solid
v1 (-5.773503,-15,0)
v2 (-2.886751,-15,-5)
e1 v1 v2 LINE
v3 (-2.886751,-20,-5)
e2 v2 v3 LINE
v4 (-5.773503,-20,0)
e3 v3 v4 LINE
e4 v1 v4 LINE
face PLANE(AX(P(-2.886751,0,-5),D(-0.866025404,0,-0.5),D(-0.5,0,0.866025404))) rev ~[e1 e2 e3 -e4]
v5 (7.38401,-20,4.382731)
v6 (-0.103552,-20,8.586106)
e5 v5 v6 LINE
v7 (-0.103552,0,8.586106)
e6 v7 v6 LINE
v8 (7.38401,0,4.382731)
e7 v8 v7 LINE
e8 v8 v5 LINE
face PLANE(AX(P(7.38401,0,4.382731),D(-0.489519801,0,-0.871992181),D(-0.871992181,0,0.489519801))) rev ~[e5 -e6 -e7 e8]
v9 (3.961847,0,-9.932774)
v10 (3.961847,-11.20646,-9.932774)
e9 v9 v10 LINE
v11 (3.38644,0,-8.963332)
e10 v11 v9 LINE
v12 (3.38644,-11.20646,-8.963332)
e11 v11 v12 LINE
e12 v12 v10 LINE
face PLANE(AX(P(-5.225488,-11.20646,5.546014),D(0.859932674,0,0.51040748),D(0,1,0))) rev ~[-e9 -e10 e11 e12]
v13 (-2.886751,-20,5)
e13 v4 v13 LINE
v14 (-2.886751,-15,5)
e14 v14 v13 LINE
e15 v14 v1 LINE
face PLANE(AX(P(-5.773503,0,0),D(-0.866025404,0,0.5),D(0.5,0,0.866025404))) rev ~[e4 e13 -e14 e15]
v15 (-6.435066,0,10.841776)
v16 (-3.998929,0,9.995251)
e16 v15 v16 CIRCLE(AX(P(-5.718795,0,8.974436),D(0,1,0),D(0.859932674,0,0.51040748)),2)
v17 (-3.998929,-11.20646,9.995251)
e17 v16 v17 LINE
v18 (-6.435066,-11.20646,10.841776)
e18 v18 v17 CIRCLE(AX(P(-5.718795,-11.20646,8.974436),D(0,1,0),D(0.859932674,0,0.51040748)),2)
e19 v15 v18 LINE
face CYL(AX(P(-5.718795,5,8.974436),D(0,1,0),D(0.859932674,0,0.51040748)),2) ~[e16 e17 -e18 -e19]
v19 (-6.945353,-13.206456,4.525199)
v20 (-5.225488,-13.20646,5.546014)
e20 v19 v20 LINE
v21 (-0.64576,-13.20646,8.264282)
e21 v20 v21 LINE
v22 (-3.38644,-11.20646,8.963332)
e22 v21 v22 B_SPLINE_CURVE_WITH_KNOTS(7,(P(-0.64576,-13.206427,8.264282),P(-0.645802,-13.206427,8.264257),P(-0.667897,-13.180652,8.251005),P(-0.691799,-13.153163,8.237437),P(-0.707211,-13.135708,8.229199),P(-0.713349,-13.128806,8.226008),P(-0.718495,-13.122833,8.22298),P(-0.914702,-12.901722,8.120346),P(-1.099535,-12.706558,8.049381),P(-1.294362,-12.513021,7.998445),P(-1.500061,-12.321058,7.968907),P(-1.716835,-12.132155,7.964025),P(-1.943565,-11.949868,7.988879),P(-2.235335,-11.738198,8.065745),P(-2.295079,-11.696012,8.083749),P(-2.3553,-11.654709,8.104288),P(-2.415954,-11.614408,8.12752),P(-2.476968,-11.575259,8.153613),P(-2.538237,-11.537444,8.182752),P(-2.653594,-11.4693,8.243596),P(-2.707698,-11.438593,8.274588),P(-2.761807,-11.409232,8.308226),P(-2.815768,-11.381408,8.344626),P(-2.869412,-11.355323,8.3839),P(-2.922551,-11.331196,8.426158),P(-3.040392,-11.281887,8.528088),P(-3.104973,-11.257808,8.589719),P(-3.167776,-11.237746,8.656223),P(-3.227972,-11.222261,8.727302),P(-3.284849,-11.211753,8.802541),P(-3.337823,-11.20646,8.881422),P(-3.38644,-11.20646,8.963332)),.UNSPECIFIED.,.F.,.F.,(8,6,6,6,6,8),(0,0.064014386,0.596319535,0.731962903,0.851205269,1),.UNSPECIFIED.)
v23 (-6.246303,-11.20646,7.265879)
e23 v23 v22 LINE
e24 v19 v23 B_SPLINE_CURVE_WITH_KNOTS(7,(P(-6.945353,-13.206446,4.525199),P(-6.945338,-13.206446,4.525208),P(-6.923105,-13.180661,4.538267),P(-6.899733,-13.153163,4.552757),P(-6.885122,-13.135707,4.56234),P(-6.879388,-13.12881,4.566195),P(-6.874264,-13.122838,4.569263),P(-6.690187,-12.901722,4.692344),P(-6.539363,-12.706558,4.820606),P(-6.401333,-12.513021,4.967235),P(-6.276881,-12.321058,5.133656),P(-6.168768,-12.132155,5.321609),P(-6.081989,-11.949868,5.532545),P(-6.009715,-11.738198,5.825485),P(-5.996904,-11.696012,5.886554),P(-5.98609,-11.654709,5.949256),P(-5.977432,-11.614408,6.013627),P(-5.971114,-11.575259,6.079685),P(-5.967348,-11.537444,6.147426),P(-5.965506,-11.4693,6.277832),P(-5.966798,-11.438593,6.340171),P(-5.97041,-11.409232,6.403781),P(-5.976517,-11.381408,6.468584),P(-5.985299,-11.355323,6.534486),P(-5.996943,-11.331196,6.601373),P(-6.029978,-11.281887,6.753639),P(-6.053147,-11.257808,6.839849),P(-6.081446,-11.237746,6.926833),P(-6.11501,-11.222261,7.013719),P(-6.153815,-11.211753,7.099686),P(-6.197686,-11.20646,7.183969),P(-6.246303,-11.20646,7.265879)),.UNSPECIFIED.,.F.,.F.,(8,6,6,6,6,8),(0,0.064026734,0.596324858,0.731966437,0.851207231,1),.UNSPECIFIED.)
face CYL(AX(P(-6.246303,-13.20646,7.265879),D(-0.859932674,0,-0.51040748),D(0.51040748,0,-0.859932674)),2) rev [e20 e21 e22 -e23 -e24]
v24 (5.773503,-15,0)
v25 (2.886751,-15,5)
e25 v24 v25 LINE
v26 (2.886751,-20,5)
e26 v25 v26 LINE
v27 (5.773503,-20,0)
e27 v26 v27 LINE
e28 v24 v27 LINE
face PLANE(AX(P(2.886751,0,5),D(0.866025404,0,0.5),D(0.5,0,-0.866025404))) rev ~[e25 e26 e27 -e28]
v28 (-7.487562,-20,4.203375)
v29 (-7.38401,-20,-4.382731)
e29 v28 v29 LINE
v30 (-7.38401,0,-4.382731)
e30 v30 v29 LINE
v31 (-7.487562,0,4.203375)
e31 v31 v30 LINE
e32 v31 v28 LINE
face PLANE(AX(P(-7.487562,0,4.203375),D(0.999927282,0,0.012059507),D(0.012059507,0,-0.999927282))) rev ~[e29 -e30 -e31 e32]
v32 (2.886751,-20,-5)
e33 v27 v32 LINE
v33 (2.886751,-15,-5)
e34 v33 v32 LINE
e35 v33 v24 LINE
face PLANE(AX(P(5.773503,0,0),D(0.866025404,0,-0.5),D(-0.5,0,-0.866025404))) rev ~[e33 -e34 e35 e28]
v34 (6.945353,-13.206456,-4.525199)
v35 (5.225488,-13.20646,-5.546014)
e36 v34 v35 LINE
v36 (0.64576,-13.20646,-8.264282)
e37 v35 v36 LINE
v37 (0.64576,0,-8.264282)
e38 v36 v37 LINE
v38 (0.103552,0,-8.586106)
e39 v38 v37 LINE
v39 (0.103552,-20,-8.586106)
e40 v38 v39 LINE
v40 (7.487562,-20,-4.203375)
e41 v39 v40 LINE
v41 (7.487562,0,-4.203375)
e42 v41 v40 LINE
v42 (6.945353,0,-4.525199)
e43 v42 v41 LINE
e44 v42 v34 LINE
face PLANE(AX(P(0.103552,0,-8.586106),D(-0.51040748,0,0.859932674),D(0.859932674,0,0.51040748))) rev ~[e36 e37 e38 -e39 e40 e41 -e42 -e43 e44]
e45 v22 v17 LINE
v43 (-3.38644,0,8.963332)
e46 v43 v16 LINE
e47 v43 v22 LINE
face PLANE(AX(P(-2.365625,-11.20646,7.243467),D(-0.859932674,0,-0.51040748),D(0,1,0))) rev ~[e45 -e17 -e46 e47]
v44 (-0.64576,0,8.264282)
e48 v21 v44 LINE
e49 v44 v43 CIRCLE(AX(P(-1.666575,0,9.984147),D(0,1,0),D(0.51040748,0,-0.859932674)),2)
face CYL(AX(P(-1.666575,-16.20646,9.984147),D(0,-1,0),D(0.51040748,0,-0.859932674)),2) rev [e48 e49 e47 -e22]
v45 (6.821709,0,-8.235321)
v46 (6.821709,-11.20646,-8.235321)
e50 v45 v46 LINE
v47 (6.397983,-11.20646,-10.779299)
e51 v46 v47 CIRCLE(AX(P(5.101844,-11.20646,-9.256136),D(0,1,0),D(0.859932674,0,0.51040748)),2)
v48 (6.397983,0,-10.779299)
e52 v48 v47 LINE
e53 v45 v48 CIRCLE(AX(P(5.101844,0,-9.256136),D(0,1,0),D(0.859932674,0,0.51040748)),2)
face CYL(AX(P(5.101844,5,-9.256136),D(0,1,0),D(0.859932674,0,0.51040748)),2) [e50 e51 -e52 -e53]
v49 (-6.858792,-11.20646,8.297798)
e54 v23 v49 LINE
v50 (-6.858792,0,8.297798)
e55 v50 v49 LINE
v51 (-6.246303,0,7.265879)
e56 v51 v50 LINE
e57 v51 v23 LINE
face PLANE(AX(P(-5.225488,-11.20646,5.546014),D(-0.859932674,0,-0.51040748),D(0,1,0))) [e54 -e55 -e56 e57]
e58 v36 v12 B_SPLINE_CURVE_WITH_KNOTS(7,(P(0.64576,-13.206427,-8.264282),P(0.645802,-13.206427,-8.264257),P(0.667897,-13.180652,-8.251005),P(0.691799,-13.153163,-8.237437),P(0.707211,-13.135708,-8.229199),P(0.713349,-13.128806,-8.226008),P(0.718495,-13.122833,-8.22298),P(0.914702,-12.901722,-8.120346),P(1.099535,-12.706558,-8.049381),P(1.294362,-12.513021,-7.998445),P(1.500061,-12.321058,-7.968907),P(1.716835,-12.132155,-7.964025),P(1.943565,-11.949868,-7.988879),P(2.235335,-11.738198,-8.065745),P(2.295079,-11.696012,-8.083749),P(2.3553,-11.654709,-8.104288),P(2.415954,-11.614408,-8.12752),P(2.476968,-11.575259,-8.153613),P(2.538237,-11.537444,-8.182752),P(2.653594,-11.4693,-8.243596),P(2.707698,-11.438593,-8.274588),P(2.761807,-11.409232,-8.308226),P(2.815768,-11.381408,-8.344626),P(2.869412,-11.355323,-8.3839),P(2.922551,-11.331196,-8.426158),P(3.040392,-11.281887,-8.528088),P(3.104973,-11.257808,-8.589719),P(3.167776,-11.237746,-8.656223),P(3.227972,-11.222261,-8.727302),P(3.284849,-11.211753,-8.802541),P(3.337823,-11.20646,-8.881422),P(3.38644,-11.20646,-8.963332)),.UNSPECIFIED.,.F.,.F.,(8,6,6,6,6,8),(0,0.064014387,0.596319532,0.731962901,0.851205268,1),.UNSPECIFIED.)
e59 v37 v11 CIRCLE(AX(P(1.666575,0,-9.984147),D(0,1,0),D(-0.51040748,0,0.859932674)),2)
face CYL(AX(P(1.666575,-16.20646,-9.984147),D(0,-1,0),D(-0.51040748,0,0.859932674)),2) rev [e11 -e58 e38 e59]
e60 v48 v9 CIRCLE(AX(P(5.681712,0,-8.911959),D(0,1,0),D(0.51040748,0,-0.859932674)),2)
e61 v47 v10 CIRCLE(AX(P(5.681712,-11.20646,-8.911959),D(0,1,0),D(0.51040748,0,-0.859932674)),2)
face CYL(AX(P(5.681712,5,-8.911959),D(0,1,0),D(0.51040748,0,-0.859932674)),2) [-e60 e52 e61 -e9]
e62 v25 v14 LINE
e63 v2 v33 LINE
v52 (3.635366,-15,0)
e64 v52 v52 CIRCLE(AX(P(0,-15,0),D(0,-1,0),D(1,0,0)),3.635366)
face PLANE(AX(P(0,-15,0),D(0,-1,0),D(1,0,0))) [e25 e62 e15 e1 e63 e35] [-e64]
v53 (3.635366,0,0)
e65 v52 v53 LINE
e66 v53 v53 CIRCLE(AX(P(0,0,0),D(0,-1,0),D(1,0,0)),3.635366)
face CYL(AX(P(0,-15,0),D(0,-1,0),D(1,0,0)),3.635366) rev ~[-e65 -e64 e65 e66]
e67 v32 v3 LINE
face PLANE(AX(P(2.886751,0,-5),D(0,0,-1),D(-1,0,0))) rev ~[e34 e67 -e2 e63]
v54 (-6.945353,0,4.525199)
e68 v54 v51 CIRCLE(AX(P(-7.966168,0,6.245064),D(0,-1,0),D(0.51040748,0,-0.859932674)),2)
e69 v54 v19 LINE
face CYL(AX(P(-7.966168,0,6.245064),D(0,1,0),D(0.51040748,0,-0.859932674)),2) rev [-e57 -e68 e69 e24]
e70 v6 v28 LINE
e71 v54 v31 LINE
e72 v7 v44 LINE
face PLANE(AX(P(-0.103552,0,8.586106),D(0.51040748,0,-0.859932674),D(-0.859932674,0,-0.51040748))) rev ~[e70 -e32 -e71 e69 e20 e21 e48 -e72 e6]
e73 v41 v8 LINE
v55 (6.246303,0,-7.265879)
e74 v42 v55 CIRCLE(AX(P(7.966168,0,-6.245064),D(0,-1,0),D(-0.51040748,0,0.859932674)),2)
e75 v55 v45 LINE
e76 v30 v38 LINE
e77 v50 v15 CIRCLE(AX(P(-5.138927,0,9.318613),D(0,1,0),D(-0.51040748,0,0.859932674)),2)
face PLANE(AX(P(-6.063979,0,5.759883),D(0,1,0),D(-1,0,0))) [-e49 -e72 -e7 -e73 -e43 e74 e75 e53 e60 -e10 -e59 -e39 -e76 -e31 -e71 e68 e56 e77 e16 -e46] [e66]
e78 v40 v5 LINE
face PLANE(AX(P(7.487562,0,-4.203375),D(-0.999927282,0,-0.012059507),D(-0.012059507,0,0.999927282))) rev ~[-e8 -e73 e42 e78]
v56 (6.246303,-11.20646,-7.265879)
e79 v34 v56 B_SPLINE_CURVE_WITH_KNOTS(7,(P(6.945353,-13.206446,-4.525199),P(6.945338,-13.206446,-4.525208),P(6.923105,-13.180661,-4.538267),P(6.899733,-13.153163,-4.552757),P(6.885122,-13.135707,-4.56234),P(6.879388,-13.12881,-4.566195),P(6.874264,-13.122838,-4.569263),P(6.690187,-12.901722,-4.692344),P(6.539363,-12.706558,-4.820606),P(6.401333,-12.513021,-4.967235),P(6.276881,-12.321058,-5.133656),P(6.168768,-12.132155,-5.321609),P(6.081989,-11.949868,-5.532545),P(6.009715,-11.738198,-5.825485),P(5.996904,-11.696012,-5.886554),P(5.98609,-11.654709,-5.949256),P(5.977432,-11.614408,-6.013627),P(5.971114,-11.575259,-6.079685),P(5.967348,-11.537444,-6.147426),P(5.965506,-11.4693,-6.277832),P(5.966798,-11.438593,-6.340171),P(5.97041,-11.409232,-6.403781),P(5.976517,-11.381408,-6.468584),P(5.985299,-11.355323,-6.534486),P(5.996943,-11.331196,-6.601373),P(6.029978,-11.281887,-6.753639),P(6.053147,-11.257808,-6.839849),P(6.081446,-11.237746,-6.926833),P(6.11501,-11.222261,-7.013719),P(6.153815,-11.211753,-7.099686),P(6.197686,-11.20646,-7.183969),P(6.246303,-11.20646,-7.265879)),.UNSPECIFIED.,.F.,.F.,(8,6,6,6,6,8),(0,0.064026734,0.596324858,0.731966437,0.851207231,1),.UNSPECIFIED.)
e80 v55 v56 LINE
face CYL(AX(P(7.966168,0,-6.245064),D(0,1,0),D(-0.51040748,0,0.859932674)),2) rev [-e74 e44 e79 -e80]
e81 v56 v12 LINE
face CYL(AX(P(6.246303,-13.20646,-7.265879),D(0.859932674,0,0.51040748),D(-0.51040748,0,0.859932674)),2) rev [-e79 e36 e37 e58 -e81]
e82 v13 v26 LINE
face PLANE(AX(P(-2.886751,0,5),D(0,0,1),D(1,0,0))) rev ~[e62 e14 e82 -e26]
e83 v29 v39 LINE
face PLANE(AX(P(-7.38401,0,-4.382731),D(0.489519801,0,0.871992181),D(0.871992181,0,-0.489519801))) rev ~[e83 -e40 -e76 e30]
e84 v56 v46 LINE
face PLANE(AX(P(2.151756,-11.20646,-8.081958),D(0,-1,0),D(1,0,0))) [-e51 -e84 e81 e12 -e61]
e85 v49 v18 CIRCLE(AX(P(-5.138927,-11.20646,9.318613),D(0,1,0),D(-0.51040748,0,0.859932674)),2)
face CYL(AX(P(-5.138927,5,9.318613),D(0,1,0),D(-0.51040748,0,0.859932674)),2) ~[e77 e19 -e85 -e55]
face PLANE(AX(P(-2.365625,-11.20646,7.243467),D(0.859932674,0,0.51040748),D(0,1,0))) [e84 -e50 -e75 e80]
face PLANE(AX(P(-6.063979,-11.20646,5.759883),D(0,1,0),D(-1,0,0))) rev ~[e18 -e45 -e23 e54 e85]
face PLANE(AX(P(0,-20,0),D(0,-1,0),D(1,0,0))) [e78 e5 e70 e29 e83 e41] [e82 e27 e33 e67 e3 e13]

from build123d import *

# Parameters (mm, degrees)
F1_DEPTH      = 20
F2_DEPTH      = 15
F4_W          = 3.3256819006
F4_H          = 11.2064601853
F5_DEPTH      = 5.2
F5_DEPTH_BACK = 20
F3_R          = 3.6353661433
F6_DEPTH      = 25
F7_T1_DEPTH   = 11.2064601853
F7_T3_DEPTH   = 3.3256819006
F7_T5_DEPTH   = 3.3256819006
F7_T11_DEPTH  = 8.3256819006
F7_T16_DEPTH  = 16.2064601853
F7_T23_DEPTH  = 16.2064601853
F7_T27_DEPTH  = 8.3256819006
F7_T35_DEPTH  = 8.3256819006
F7_T40_DEPTH  = 16.2064601853
F7_T47_DEPTH  = 16.2064601853
F7_T51_DEPTH  = 8.3256819006
F7_T55_DEPTH  = 21.2064601853


# Not quite as in the source:
# - a fillet or chamfer that OpenCascade refuses, or shapes differently, is made with other operations: its cross-section is extruded or revolved along the edge and cut away or added


with BuildPart() as f1:
    # F0 (on Front) → F1 (new body)
    with BuildSketch(Plane.XZ):
        Polygon((7.3840099636, 4.3827313822), (-0.1035517331, 8.5861059014), (-7.4875616967, 4.2033745192), (-7.3840099636, -4.3827313822), (0.1035517331, -8.5861059014), (7.4875616967, -4.2033745192), align=None)
        Polygon((-2.8867513459, 5), (2.8867513459, 5), (5.7735026919, 0), (2.8867513459, -5), (-2.8867513459, -5), (-5.7735026919, 0), align=None, mode=Mode.SUBTRACT)
    extrude(amount=F1_DEPTH)

    # F0 (on Front) → F2 (join)
    with BuildSketch(Plane.XZ):
        Polygon((5.7735026919, 0), (2.8867513459, 5), (-2.8867513459, 5), (-5.7735026919, 0), (-2.8867513459, -5), (2.8867513459, -5), align=None)
    extrude(amount=F2_DEPTH)

    # F4 (on face) → F5 (join, two sides)
    with BuildSketch(Plane(origin=(-3.7955567149, 0, 6.3947402103), x_dir=(0.8599326743, 0, 0.51040748), z_dir=(-0.51040748, 0, 0.8599326743))) as f5_sk:
        with Locations((0, -5.6032300927)):
            Rectangle(F4_W, F4_H)
    extrude(amount=F5_DEPTH)
    extrude(f5_sk.sketch, amount=-F5_DEPTH_BACK)

    # F3 (on face) → F6 (cut)
    with BuildSketch(Plane.XZ.offset(15)):
        Circle(F3_R)
    extrude(amount=-F6_DEPTH, mode=Mode.SUBTRACT)

    # F7: fillet of radius 2 on 10 edges, made by hand

    # F7_s2 → F7_t1 (join)
    with BuildSketch(Plane.XZ):
        with BuildLine():
            ThreePointArc((-6.9453533288, 4.525198791), (-6.0282146576, 5.7507608695), (-6.2463029403, 7.2658790997))
            Line((-6.2463029403, 7.2658790997), (-5.2254879802, 5.5460137511))
            Line((-5.2254879802, 5.5460137511), (-6.9453533288, 4.525198791))
        make_face()
        with BuildLine():
            ThreePointArc((-0.645760101, 8.2642816296), (-2.1608783312, 8.0461933468), (-3.3864404097, 8.963332018))
            Line((-3.3864404097, 8.963332018), (-2.3656254496, 7.2434666695))
            Line((-2.3656254496, 7.2434666695), (-0.645760101, 8.2642816296))
        make_face()
        with BuildLine():
            ThreePointArc((6.9453533288, -4.525198791), (6.0282146576, -5.7507608695), (6.2463029403, -7.2658790997))
            Line((6.2463029403, -7.2658790997), (5.2254879802, -5.5460137511))
            Line((5.2254879802, -5.5460137511), (6.9453533288, -4.525198791))
        make_face()
        with BuildLine():
            ThreePointArc((0.645760101, -8.2642816296), (2.1608783312, -8.0461933468), (3.3864404097, -8.963332018))
            Line((3.3864404097, -8.963332018), (2.3656254496, -7.2434666695))
            Line((2.3656254496, -7.2434666695), (0.645760101, -8.2642816296))
        make_face()
    extrude(amount=F7_T1_DEPTH)

    # F7_s4 → F7_t3 (join)
    with BuildSketch(Plane(origin=(-1.4299312653, 0, -0.8487264592), x_dir=(0, 1, 0), z_dir=(0.8599326743, 0, 0.51040748))):
        with BuildLine():
            ThreePointArc((-13.2064601853, 7.4363265887), (-11.792246623, 8.0221130263), (-11.2064601853, 9.4363265887))
            Line((-11.2064601853, 9.4363265887), (-11.2064601853, 7.4363265887))
            Line((-11.2064601853, 7.4363265887), (-13.2064601853, 7.4363265887))
        make_face()
    extrude(amount=F7_T3_DEPTH)

    # F7_s6 → F7_t5 (join)
    with BuildSketch(Plane(origin=(1.4299312653, 0, 0.8487264592), x_dir=(0, 1, 0), z_dir=(-0.8599326743, 0, -0.51040748))):
        with BuildLine():
            ThreePointArc((-13.2064601853, 7.4363265887), (-11.792246623, 8.0221130263), (-11.2064601853, 9.4363265887))
            Line((-11.2064601853, 9.4363265887), (-11.2064601853, 7.4363265887))
            Line((-11.2064601853, 7.4363265887), (-13.2064601853, 7.4363265887))
        make_face()
    extrude(amount=F7_T5_DEPTH)


with BuildPart() as f7_tool9:
    # F7_s10 → F7_t11 (new body)
    with BuildSketch(Plane(origin=(-5.7295946368, 0, -3.4007638594), x_dir=(0, 1, 0), z_dir=(0.8599326743, 0, 0.51040748))):
        with BuildLine():
            ThreePointArc((-13.2064601853, 7.4363265887), (-11.792246623, 8.0221130263), (-11.2064601853, 9.4363265887))
            Line((-11.2064601853, 9.4363265887), (-11.2064601853, 7.4363265887))
            Line((-11.2064601853, 7.4363265887), (-13.2064601853, 7.4363265887))
        make_face()
    extrude(amount=F7_T11_DEPTH)

    split(bisect_by=Plane(origin=(-7.4357858302, 0, -0.0896784315), x_dir=(0, 1, 0), z_dir=(0.9999272815, 0, 0.0120595069)), keep=Keep.TOP)

    split(bisect_by=Plane(origin=(-1.4299312653, 0, -0.8487264592), x_dir=(0, 1, 0), z_dir=(-0.8599326743, 0, -0.51040748)), keep=Keep.TOP)


with BuildPart() as f7_tool14:
    # F7_s15 → F7_t16 (new body)
    with BuildSketch(Plane.XZ):
        with BuildLine():
            ThreePointArc((-6.9453533288, 4.525198791), (-6.0282146576, 5.7507608695), (-6.2463029403, 7.2658790997))
            Line((-6.2463029403, 7.2658790997), (-5.2254879802, 5.5460137511))
            Line((-5.2254879802, 5.5460137511), (-6.9453533288, 4.525198791))
        make_face()
    extrude(amount=F7_T16_DEPTH)

    split(bisect_by=Plane.XZ.offset(11.2064601853), keep=Keep.TOP)


with BuildPart() as f7_tool9_1:
    add(f7_tool9.part)

    # F7_t18: intersect F7_tool14
    add(f7_tool14.part, mode=Mode.INTERSECT)


with BuildPart() as f1_1:
    add(f1.part)

    # F7_t7: union F7_tool9
    add(f7_tool9_1.part)


with BuildPart() as f7_tool21:
    # F7_s22 → F7_t23 (new body)
    with BuildSketch(Plane.XZ.offset(16.2064601853)):
        with BuildLine():
            ThreePointArc((-0.645760101, 8.2642816296), (-2.1608783312, 8.0461933468), (-3.3864404097, 8.963332018))
            Line((-3.3864404097, 8.963332018), (-2.3656254496, 7.2434666695))
            Line((-2.3656254496, 7.2434666695), (-0.645760101, 8.2642816296))
        make_face()
    extrude(amount=-F7_T23_DEPTH)

    split(bisect_by=Plane.XZ.offset(11.2064601853), keep=Keep.TOP)


with BuildPart() as f7_tool25:
    # F7_s26 → F7_t27 (new body)
    with BuildSketch(Plane(origin=(-1.4299312653, 0, -0.8487264592), x_dir=(0, 1, 0), z_dir=(0.8599326743, 0, 0.51040748))):
        with BuildLine():
            ThreePointArc((-13.2064601853, 7.4363265887), (-11.792246623, 8.0221130263), (-11.2064601853, 9.4363265887))
            Line((-11.2064601853, 9.4363265887), (-11.2064601853, 7.4363265887))
            Line((-11.2064601853, 7.4363265887), (-13.2064601853, 7.4363265887))
        make_face()
    extrude(amount=F7_T27_DEPTH)

    split(bisect_by=Plane(origin=(3.6402291153, 0, 6.4844186418), x_dir=(0, 1, 0), z_dir=(-0.4895198015, 0, -0.8719921811)), keep=Keep.TOP)

    split(bisect_by=Plane(origin=(1.4299312653, 0, 0.8487264592), x_dir=(0, 1, 0), z_dir=(0.8599326743, 0, 0.51040748)), keep=Keep.TOP)


with BuildPart() as f7_tool21_1:
    add(f7_tool21.part)

    # F7_t30: intersect F7_tool25
    add(f7_tool25.part, mode=Mode.INTERSECT)


with BuildPart() as f1_2:
    add(f1_1.part)

    # F7_t19: union F7_tool21
    add(f7_tool21_1.part)


with BuildPart() as f7_tool33:
    # F7_s34 → F7_t35 (new body)
    with BuildSketch(Plane(origin=(5.7295946368, 0, 3.4007638594), x_dir=(0, 1, 0), z_dir=(-0.8599326743, 0, -0.51040748))):
        with BuildLine():
            ThreePointArc((-13.2064601853, 7.4363265887), (-11.792246623, 8.0221130263), (-11.2064601853, 9.4363265887))
            Line((-11.2064601853, 9.4363265887), (-11.2064601853, 7.4363265887))
            Line((-11.2064601853, 7.4363265887), (-13.2064601853, 7.4363265887))
        make_face()
    extrude(amount=F7_T35_DEPTH)

    split(bisect_by=Plane(origin=(7.4357858302, 0, 0.0896784315), x_dir=(0, 1, 0), z_dir=(-0.9999272815, 0, -0.0120595069)), keep=Keep.TOP)

    split(bisect_by=Plane(origin=(1.4299312653, 0, 0.8487264592), x_dir=(0, 1, 0), z_dir=(0.8599326743, 0, 0.51040748)), keep=Keep.TOP)


with BuildPart() as f7_tool38:
    # F7_s39 → F7_t40 (new body)
    with BuildSketch(Plane.XZ):
        with BuildLine():
            ThreePointArc((6.9453533288, -4.525198791), (6.0282146576, -5.7507608695), (6.2463029403, -7.2658790997))
            Line((6.2463029403, -7.2658790997), (5.2254879802, -5.5460137511))
            Line((5.2254879802, -5.5460137511), (6.9453533288, -4.525198791))
        make_face()
    extrude(amount=F7_T40_DEPTH)

    split(bisect_by=Plane.XZ.offset(11.2064601853), keep=Keep.TOP)


with BuildPart() as f7_tool33_1:
    add(f7_tool33.part)

    # F7_t42: intersect F7_tool38
    add(f7_tool38.part, mode=Mode.INTERSECT)


with BuildPart() as f1_3:
    add(f1_2.part)

    # F7_t31: union F7_tool33
    add(f7_tool33_1.part)


with BuildPart() as f7_tool45:
    # F7_s46 → F7_t47 (new body)
    with BuildSketch(Plane.XZ.offset(16.2064601853)):
        with BuildLine():
            ThreePointArc((0.645760101, -8.2642816296), (2.1608783312, -8.0461933468), (3.3864404097, -8.963332018))
            Line((3.3864404097, -8.963332018), (2.3656254496, -7.2434666695))
            Line((2.3656254496, -7.2434666695), (0.645760101, -8.2642816296))
        make_face()
    extrude(amount=-F7_T47_DEPTH)

    split(bisect_by=Plane.XZ.offset(11.2064601853), keep=Keep.TOP)


with BuildPart() as f7_tool49:
    # F7_s50 → F7_t51 (new body)
    with BuildSketch(Plane(origin=(1.4299312653, 0, 0.8487264592), x_dir=(0, 1, 0), z_dir=(-0.8599326743, 0, -0.51040748))):
        with BuildLine():
            ThreePointArc((-13.2064601853, 7.4363265887), (-11.792246623, 8.0221130263), (-11.2064601853, 9.4363265887))
            Line((-11.2064601853, 9.4363265887), (-11.2064601853, 7.4363265887))
            Line((-11.2064601853, 7.4363265887), (-13.2064601853, 7.4363265887))
        make_face()
    extrude(amount=F7_T51_DEPTH)

    split(bisect_by=Plane(origin=(-3.6402291153, 0, -6.4844186418), x_dir=(0, 1, 0), z_dir=(0.4895198015, 0, 0.8719921811)), keep=Keep.TOP)

    split(bisect_by=Plane(origin=(-1.4299312653, 0, -0.8487264592), x_dir=(0, 1, 0), z_dir=(-0.8599326743, 0, -0.51040748)), keep=Keep.TOP)


with BuildPart() as f7_tool45_1:
    add(f7_tool45.part)

    # F7_t54: intersect F7_tool49
    add(f7_tool49.part, mode=Mode.INTERSECT)


with BuildPart() as f1_4:
    add(f1_3.part)

    # F7_t43: union F7_tool45
    add(f7_tool45_1.part)

    # F7_s56 → F7_t55 (cut)
    with BuildSketch(Plane.XZ.offset(-5)):
        with BuildLine():
            ThreePointArc((-6.1597415279, 11.0384786175), (-7.0768801991, 9.8129165391), (-6.8587919164, 8.2977983089))
            Line((-6.8587919164, 8.2977983089), (-7.8796068765, 10.0176636575))
            Line((-7.8796068765, 10.0176636575), (-6.1597415279, 11.0384786175))
        make_face()
        with BuildLine():
            ThreePointArc((-3.9989293858, 9.9952512272), (-5.2244914642, 10.9123898984), (-6.7396096944, 10.6943016157))
            Line((-6.7396096944, 10.6943016157), (-5.0197443458, 11.7151165758))
            Line((-5.0197443458, 11.7151165758), (-3.9989293858, 9.9952512272))
        make_face()
        with BuildLine():
            ThreePointArc((6.7025269693, -10.6318247746), (5.1874087391, -10.8499130573), (3.9618466606, -9.9327743861))
            Line((3.9618466606, -9.9327743861), (4.9826616207, -11.6526397347))
            Line((4.9826616207, -11.6526397347), (6.7025269693, -10.6318247746))
        make_face()
        with BuildLine():
            ThreePointArc((6.8217091912, -8.2353214678), (7.039797474, -9.750439698), (6.1226588027, -10.9760017765))
            Line((6.1226588027, -10.9760017765), (7.8425241513, -9.9551868164))
            Line((7.8425241513, -9.9551868164), (6.8217091912, -8.2353214678))
        make_face()
    extrude(amount=F7_T55_DEPTH, mode=Mode.SUBTRACT)


solid = f1_4.part
